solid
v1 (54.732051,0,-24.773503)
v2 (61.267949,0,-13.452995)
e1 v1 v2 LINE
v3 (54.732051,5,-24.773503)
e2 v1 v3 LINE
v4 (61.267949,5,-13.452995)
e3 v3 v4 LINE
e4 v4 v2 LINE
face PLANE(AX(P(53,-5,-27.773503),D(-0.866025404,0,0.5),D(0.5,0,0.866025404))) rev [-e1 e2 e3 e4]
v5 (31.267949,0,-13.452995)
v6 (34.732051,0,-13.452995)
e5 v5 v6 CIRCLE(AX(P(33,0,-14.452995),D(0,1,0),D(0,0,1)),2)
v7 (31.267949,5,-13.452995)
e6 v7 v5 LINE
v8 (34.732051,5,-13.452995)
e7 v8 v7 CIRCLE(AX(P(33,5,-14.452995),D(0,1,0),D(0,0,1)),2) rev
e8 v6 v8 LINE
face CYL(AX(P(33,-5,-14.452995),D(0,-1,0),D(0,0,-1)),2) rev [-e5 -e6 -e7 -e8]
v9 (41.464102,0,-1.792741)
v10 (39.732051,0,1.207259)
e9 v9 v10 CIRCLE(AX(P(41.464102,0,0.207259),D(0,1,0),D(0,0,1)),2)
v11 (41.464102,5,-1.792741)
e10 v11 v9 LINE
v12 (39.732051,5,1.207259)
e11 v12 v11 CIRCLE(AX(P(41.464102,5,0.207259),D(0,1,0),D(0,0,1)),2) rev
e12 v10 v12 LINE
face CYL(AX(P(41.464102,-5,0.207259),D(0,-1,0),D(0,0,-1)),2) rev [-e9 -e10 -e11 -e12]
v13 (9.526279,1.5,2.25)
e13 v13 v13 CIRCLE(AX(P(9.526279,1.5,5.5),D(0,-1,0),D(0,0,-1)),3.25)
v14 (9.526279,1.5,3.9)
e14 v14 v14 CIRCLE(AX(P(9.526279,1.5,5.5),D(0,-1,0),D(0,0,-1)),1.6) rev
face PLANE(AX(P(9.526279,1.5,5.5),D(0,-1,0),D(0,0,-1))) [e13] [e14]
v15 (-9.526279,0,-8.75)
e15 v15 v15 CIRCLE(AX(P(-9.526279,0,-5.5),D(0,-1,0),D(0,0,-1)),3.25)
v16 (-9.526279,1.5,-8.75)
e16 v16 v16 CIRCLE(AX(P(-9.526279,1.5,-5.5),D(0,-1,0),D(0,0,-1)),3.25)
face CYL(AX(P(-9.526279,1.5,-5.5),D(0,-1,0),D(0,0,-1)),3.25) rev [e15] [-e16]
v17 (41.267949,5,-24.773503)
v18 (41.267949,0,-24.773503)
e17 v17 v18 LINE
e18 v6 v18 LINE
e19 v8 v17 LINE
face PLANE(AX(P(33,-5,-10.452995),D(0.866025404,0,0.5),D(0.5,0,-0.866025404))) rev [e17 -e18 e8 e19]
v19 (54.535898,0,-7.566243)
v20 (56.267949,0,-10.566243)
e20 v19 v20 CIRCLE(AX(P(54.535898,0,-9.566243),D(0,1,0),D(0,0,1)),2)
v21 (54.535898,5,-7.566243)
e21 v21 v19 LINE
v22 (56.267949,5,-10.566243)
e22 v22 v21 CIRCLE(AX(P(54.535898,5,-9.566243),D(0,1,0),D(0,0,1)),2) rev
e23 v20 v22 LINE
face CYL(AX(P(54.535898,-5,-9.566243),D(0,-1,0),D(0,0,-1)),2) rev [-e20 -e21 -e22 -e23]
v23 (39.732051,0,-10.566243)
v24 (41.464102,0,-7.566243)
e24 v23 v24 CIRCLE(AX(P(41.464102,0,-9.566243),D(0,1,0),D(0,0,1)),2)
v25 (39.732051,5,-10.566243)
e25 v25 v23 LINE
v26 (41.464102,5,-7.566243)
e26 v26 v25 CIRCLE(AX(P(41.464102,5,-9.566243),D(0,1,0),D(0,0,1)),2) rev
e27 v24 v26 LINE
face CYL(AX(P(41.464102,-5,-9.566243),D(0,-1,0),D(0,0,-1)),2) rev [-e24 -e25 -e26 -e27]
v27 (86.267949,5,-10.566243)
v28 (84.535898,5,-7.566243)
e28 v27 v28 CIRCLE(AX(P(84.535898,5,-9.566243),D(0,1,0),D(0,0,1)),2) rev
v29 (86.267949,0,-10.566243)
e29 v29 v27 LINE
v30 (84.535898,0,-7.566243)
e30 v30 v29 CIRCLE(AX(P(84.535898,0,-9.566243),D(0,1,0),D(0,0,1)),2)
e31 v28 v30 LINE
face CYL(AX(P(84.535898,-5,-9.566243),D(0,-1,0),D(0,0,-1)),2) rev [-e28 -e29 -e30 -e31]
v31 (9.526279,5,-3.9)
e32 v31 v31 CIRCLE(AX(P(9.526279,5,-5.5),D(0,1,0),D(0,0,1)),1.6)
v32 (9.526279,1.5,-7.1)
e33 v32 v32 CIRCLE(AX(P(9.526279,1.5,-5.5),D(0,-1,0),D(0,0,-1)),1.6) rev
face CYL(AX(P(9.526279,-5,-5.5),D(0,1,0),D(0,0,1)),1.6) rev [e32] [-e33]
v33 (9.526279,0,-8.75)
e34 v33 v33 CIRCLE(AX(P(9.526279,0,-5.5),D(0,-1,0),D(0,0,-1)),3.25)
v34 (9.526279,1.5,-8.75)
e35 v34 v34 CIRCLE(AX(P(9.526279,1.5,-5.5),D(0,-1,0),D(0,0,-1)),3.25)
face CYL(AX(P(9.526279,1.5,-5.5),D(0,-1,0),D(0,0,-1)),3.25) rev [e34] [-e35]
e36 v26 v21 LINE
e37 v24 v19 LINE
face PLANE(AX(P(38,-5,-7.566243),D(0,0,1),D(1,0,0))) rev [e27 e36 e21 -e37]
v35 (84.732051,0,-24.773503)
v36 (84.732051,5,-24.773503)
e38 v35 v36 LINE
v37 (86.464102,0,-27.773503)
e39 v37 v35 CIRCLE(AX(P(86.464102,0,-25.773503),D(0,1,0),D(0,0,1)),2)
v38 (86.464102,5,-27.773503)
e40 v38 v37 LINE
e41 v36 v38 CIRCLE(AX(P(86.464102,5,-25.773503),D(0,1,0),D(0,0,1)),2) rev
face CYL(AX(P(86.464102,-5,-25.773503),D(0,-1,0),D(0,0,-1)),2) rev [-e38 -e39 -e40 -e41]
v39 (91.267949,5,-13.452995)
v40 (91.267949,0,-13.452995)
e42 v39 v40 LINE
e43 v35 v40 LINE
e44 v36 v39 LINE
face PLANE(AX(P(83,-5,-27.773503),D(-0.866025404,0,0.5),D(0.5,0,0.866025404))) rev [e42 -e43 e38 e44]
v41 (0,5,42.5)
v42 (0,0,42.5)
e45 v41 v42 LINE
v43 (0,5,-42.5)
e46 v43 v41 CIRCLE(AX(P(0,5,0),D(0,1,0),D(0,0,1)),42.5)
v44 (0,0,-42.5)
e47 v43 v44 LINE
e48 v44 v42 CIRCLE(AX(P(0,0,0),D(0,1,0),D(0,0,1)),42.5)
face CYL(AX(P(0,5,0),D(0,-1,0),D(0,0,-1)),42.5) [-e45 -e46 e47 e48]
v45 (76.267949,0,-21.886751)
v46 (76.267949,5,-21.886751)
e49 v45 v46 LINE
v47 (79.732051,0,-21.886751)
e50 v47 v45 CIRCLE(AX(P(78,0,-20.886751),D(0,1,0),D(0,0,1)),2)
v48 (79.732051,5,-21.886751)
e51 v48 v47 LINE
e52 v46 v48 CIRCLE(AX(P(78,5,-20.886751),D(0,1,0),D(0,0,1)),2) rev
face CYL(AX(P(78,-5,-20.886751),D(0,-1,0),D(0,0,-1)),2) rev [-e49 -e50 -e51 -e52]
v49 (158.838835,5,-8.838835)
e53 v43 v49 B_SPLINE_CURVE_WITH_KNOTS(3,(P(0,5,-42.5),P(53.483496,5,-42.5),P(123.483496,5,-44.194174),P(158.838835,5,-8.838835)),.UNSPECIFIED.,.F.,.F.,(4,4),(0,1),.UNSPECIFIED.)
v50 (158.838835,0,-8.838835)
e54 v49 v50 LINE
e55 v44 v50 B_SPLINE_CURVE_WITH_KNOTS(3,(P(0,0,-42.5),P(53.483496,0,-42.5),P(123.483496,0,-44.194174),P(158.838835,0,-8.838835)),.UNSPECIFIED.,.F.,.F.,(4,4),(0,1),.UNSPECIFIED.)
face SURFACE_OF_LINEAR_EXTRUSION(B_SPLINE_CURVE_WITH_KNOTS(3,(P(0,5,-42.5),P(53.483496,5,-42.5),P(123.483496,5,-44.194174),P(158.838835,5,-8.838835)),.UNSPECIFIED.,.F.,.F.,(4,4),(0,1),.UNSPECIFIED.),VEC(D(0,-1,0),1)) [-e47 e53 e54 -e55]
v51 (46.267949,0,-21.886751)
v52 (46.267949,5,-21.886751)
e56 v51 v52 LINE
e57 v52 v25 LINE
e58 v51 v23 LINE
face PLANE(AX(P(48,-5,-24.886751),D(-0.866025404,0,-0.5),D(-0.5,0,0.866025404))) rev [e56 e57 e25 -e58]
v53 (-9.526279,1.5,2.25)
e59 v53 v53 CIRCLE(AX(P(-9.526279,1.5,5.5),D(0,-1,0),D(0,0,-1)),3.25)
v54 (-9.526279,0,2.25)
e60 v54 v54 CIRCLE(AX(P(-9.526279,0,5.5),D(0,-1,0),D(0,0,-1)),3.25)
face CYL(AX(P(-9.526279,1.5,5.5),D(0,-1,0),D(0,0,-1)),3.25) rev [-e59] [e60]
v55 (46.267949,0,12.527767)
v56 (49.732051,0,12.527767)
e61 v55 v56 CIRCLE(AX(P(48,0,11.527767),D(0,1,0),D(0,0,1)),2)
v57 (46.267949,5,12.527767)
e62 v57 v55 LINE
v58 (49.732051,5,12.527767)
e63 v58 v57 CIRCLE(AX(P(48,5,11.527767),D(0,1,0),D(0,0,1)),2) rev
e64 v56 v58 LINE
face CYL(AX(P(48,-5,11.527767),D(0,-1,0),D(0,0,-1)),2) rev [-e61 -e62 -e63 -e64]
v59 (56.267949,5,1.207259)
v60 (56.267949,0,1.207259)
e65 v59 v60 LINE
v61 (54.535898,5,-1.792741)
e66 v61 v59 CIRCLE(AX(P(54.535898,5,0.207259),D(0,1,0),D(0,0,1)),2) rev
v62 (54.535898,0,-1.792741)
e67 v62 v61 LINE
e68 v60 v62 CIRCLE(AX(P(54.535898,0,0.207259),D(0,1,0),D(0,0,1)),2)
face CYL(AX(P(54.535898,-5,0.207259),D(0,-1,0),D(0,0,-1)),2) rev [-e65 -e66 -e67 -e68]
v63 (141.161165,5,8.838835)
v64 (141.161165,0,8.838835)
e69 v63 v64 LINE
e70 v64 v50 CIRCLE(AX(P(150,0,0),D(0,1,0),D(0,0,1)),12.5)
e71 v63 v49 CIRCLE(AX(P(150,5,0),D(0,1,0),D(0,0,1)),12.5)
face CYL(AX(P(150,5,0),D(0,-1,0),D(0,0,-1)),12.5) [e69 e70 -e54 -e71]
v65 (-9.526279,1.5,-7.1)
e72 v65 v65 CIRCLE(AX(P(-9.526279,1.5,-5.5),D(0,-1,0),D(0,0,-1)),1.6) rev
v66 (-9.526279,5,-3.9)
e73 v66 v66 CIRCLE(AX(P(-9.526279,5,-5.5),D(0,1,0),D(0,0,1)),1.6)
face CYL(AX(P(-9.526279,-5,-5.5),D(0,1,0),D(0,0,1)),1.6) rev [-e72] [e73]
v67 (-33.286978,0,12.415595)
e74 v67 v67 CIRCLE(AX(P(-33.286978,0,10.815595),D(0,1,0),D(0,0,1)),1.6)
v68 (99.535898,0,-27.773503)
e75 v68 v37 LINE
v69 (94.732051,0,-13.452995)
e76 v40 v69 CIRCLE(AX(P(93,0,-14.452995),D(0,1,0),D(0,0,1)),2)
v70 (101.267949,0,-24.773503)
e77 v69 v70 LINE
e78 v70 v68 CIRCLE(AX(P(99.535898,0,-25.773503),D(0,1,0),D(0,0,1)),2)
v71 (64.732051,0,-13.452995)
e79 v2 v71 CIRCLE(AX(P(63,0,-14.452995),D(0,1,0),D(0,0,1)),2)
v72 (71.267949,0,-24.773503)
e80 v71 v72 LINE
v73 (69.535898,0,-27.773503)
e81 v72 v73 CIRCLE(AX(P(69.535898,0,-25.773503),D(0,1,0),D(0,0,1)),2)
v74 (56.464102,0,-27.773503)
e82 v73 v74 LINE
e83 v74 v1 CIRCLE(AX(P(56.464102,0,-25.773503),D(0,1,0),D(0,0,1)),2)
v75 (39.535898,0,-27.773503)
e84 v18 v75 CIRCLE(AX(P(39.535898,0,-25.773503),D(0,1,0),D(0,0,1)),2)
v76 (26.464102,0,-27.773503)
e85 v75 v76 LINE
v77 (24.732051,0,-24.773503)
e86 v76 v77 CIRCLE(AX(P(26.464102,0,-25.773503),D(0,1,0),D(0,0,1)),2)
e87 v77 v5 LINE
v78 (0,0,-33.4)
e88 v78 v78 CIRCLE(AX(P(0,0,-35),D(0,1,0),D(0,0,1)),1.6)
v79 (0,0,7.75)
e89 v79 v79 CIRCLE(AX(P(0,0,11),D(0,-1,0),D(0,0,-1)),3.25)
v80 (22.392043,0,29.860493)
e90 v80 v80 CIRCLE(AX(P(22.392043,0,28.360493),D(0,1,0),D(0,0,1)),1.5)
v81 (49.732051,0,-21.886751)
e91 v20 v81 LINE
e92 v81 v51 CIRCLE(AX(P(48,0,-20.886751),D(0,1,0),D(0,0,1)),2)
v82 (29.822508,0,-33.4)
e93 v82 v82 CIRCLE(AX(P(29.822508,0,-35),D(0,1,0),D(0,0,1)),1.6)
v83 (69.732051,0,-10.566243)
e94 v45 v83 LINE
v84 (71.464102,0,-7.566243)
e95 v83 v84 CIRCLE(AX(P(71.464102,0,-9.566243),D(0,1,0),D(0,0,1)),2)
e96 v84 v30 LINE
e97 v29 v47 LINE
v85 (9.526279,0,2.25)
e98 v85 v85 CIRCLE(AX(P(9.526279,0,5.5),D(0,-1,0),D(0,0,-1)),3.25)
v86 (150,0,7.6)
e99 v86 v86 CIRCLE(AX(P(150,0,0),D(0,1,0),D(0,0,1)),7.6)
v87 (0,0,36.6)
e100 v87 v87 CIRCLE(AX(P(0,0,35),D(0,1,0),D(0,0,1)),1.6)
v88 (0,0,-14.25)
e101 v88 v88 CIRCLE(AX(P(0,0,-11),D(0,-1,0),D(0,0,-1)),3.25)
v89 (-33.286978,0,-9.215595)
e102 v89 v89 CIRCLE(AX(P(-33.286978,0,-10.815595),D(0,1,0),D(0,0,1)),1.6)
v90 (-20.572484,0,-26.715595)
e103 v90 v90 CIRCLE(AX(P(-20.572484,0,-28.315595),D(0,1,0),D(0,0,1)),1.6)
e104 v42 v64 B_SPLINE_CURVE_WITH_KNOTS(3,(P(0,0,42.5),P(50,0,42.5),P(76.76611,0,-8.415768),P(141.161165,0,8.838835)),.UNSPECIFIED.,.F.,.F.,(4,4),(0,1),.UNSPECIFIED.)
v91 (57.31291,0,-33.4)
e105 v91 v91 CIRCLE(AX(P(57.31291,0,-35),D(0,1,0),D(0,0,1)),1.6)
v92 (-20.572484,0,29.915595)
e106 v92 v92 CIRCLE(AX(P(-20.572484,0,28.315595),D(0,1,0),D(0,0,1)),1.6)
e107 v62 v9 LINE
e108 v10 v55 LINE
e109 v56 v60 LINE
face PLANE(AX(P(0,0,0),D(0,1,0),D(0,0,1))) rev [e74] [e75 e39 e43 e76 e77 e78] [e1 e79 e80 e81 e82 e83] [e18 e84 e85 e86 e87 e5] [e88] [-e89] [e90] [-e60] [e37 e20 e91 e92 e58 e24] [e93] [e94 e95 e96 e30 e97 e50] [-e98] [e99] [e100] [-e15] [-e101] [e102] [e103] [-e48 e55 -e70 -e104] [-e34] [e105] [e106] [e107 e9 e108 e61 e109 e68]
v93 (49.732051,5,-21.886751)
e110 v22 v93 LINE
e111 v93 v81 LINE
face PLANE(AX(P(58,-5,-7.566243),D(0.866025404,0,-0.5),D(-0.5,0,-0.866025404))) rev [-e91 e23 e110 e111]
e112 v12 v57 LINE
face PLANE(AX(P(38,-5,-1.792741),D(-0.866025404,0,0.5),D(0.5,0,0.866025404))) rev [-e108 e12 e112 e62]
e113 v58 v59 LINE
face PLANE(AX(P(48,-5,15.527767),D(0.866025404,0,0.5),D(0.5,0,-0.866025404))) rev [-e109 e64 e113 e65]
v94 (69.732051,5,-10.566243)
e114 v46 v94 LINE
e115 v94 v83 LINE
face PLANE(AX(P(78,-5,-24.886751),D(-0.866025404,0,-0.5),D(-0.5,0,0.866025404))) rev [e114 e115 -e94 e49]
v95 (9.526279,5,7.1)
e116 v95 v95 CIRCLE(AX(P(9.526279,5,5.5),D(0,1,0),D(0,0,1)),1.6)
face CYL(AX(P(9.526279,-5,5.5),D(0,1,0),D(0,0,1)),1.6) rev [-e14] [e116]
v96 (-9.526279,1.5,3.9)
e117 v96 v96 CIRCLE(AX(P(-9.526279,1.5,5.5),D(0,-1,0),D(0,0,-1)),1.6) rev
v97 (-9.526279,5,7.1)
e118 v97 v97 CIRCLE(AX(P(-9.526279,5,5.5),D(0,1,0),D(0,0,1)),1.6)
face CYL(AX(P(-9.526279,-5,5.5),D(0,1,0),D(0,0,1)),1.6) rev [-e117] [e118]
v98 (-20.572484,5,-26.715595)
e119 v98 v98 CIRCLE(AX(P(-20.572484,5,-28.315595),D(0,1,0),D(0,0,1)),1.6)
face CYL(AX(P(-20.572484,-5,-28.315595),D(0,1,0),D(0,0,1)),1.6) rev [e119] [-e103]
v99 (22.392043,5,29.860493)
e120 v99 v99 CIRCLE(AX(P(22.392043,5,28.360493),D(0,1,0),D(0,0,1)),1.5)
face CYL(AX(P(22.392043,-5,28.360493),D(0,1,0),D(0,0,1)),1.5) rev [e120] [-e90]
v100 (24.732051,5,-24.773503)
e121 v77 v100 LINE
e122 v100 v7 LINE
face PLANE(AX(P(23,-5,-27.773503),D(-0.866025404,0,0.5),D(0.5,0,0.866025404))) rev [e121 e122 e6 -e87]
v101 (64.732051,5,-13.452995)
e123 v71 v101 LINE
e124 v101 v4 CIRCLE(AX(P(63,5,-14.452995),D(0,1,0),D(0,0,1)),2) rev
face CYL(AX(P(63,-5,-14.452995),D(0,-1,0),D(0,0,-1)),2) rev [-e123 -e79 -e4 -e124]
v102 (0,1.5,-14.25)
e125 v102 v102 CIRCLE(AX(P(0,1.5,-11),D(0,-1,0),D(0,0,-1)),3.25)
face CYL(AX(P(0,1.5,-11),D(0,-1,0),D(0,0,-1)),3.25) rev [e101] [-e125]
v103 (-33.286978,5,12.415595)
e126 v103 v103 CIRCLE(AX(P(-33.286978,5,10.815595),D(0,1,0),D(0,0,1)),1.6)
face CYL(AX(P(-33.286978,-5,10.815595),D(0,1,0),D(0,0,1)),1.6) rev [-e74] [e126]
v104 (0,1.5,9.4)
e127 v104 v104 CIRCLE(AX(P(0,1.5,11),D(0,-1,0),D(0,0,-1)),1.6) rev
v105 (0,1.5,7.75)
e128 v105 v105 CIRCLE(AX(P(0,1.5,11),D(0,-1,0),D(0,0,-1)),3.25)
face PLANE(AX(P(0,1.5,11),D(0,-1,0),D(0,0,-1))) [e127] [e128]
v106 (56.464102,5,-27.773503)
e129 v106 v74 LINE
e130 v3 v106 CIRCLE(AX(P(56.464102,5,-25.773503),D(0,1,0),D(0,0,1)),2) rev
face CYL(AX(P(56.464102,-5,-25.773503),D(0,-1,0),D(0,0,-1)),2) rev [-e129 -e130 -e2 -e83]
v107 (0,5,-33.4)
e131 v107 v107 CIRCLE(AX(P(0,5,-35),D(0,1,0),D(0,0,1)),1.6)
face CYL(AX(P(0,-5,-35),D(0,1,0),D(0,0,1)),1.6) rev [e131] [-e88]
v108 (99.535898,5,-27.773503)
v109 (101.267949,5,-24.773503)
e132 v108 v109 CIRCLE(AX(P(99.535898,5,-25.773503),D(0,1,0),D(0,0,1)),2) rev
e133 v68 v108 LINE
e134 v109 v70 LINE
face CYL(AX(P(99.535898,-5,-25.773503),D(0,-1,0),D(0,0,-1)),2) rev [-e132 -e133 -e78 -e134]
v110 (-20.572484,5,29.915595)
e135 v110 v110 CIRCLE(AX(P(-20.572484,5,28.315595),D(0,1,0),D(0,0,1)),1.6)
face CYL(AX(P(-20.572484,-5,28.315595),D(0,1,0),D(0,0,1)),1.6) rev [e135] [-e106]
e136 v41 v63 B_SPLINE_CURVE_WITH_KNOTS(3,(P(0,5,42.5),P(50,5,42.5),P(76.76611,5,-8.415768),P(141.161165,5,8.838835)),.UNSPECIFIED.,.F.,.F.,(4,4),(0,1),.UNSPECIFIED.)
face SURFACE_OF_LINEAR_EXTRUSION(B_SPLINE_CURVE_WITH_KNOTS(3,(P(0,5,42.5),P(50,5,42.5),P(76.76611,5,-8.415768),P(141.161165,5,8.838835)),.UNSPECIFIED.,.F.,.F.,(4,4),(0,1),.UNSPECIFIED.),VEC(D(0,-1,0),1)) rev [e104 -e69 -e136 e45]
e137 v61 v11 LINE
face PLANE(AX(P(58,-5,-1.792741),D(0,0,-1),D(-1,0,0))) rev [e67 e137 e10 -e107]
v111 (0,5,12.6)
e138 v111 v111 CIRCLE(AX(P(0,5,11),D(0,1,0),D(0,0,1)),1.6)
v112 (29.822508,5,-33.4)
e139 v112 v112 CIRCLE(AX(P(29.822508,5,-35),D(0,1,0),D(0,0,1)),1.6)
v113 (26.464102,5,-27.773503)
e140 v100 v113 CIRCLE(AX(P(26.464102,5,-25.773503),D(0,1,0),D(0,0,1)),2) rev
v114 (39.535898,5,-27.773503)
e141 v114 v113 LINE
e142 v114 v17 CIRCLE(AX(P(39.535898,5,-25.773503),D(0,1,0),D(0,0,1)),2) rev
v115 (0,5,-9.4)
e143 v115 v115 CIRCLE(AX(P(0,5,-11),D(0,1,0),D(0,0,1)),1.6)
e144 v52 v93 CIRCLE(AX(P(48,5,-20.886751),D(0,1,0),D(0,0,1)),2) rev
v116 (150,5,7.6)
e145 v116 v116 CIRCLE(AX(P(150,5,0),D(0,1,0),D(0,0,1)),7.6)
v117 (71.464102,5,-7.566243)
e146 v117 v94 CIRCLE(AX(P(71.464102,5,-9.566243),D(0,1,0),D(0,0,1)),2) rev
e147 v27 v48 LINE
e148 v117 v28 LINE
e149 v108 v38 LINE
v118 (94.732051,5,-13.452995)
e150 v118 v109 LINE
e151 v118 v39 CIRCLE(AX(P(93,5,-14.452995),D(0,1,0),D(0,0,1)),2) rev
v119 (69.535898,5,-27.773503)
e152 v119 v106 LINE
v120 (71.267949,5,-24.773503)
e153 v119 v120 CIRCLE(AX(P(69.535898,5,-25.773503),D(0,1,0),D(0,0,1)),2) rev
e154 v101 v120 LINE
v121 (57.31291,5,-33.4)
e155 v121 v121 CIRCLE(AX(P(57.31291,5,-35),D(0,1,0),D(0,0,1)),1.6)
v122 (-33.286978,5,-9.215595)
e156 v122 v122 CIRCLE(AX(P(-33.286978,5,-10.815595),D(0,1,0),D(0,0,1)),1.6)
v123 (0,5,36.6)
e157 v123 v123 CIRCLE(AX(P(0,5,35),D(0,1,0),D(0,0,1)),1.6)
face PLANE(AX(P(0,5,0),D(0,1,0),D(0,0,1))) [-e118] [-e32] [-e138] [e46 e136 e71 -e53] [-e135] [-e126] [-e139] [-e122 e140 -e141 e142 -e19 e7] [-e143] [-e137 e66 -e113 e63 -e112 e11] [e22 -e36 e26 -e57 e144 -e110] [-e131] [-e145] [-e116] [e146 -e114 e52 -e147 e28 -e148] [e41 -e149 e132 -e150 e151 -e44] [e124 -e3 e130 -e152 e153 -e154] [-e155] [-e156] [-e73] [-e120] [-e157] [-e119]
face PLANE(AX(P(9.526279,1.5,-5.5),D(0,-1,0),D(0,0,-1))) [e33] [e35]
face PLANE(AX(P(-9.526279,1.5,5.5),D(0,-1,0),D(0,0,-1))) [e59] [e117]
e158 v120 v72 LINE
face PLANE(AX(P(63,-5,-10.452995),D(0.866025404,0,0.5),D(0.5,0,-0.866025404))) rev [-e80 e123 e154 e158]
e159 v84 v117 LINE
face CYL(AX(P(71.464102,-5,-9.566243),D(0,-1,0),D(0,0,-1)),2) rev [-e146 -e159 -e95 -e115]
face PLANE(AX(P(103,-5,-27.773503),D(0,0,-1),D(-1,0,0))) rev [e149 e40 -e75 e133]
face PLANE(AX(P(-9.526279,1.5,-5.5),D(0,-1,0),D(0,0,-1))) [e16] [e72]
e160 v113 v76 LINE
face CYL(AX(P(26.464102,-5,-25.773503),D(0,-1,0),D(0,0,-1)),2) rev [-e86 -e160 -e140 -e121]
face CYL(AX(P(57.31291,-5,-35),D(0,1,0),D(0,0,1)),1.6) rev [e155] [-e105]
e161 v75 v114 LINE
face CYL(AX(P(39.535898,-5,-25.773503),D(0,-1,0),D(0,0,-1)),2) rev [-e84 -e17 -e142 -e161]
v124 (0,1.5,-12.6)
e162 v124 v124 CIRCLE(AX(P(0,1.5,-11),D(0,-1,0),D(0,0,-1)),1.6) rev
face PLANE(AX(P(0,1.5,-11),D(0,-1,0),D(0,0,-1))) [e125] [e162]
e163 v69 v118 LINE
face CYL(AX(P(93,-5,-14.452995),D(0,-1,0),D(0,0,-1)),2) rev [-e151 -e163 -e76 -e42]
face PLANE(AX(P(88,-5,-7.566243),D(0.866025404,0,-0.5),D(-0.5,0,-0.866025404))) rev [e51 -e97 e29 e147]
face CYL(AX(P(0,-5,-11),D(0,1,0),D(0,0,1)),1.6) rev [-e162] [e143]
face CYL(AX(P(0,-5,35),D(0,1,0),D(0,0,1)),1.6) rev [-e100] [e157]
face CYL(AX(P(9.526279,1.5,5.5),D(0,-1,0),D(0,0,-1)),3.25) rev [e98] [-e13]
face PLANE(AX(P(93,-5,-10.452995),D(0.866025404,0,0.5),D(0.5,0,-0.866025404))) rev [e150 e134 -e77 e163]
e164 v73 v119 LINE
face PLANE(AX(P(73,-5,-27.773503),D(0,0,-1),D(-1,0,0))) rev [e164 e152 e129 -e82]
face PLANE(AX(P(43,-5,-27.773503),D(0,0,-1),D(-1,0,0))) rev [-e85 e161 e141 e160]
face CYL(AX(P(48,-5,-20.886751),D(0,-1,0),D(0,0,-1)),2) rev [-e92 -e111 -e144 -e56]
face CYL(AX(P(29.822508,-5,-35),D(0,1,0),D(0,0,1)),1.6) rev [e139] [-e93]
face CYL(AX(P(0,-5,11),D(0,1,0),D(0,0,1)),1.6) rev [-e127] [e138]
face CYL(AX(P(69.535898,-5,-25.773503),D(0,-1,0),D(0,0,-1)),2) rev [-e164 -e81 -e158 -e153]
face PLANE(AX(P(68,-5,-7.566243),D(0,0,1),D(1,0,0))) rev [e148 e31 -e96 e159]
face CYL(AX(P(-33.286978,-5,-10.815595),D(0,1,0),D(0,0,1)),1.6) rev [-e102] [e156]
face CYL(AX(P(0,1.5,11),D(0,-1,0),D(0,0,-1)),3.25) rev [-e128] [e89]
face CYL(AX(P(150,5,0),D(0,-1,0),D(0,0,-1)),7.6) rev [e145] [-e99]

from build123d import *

# Parameters (mm, degrees)
BOSS_EXTRUDE3_OUTLINE_R = 7.6
BOSS_EXTRUDE3_DEPTH     = 5
SKETCH2_R               = 1.6
CUT_EXTRUDE1_DEPTH      = 10
SKETCH3_R               = 1.6
CUT_EXTRUDE2_DEPTH      = 10
SKETCH4_R               = 1.5
CUT_EXTRUDE3_DEPTH      = 10
SKETCH5_R               = 3.25
CUT_EXTRUDE4_DEPTH      = 1.5
CUT_EXTRUDE5_DEPTH      = 10
FILLET1_R               = 2
FILL_PATTERN1_DEPTH     = 5
CUT_EXTRUDE6_DEPTH      = 10
FILLET2_R               = 2
FILL_PATTERN2_DEPTH     = 5


# Read off the part's stored shape, not the designer's step: Boss-Extrude3, Fill Pattern1, Fill Pattern2
with BuildPart() as part:
    # Boss-Extrude3 outline → Boss-Extrude3 (new body)
    with BuildSketch(Plane(origin=(0, 0, 0), x_dir=(1, 0, 0), z_dir=(0, 1, 0))):
        with BuildLine():
            ThreePointArc((0, 42.5), (-42.5, 0), (0, -42.5))
            add(Edge.make_bspline(
                [(0, -42.5), (50, -42.5), (76.766110149, 8.415768242), (141.161165235, -8.838834765)],
                knots=[0, 0, 0, 0, 1, 1, 1, 1], degree=3))
            ThreePointArc((141.161165235, -8.838834765), (158.838834765, -8.838834765), (158.838834765, 8.838834765))
            add(Edge.make_bspline(
                [(0, 42.5), (53.483495706, 42.5), (123.483495706, 44.194173824), (158.838834765, 8.838834765)],
                knots=[0, 0, 0, 0, 1, 1, 1, 1], degree=3))
        make_face()
        with Locations((150, 0)):
            Circle(BOSS_EXTRUDE3_OUTLINE_R, mode=Mode.SUBTRACT)
    extrude(amount=BOSS_EXTRUDE3_DEPTH)

    # Sketch2 → Cut-Extrude1 (cut)
    with BuildSketch(Plane(origin=(0, 5, 0), x_dir=(1, 0, 0), z_dir=(0, 1, 0))):
        with Locations(Location((0, 35, 0), (0, 0, 270))):
            Circle(SKETCH2_R)
        with Locations(Location((0, 11, 0), (0, 0, 270))):
            Circle(SKETCH2_R)
        with Locations(Location((9.526279442, 5.5, 0), (0, 0, 270))):
            Circle(SKETCH2_R)
        with Locations(Location((9.526279442, -5.5, 0), (0, 0, 270))):
            Circle(SKETCH2_R)
        with Locations(Location((0, -11, 0), (0, 0, 270))):
            Circle(SKETCH2_R)
        with Locations(Location((-9.526279442, -5.5, 0), (0, 0, 270))):
            Circle(SKETCH2_R)
        with Locations(Location((-9.526279442, 5.5, 0), (0, 0, 270))):
            Circle(SKETCH2_R)
        with Locations(Location((-20.57248383, 28.315594803, 0), (0, 0, 270))):
            Circle(SKETCH2_R)
        with Locations(Location((-33.28697807, 10.815594803, 0), (0, 0, 270))):
            Circle(SKETCH2_R)
        with Locations(Location((-33.28697807, -10.815594803, 0), (0, 0, 270))):
            Circle(SKETCH2_R)
        with Locations(Location((-20.57248383, -28.315594803, 0), (0, 0, 270))):
            Circle(SKETCH2_R)
        with Locations(Location((0, -35, 0), (0, 0, 270))):
            Circle(SKETCH2_R)
    extrude(amount=-CUT_EXTRUDE1_DEPTH, mode=Mode.SUBTRACT)

    # Sketch3 → Cut-Extrude2 (cut)
    with BuildSketch(Plane(origin=(0, 5, 0), x_dir=(1, 0, 0), z_dir=(0, 1, 0))):
        with Locations(Location((29.822508304, 35, 0), (0, 0, 270))):
            Circle(SKETCH3_R)
        with Locations(Location((57.312909887, 35, 0), (0, 0, 270))):
            Circle(SKETCH3_R)
    extrude(amount=-CUT_EXTRUDE2_DEPTH, mode=Mode.SUBTRACT)

    # Sketch4 → Cut-Extrude3 (cut)
    with BuildSketch(Plane(origin=(0, 5, 0), x_dir=(1, 0, 0), z_dir=(0, 1, 0))):
        with Locations(Location((22.392043347, -28.36049342, 0), (0, 0, 270))):
            Circle(SKETCH4_R)
    extrude(amount=-CUT_EXTRUDE3_DEPTH, mode=Mode.SUBTRACT)

    # Sketch5 → Cut-Extrude4 (cut)
    with BuildSketch(Plane.XZ):
        with Locations(Location((0, 11, 0), (0, 0, 270))):
            Circle(SKETCH5_R)
        with Locations(Location((9.526279442, 5.5, 0), (0, 0, 270))):
            Circle(SKETCH5_R)
        with Locations(Location((9.526279442, -5.5, 0), (0, 0, 270))):
            Circle(SKETCH5_R)
        with Locations(Location((0, -11, 0), (0, 0, 270))):
            Circle(SKETCH5_R)
        with Locations(Location((-9.526279442, -5.5, 0), (0, 0, 270))):
            Circle(SKETCH5_R)
        with Locations(Location((-9.526279442, 5.5, 0), (0, 0, 270))):
            Circle(SKETCH5_R)
    extrude(amount=-CUT_EXTRUDE4_DEPTH, mode=Mode.SUBTRACT)

    # Sketch6 → Cut-Extrude5 (cut)
    with BuildSketch(Plane(origin=(0, 5, 0), x_dir=(1, 0, 0), z_dir=(0, 1, 0))):
        Polygon((43, 27.773502692), (23, 27.773502692), (33, 10.452994616), align=None)
    extrude(amount=-CUT_EXTRUDE5_DEPTH, mode=Mode.SUBTRACT)

    # Fillet1
    fillet1_edges = [part.edges().sort_by_distance(p)[0] for p in [
        (43, 2.5, -27.773502692),
        (33, 2.5, -10.452994616),
        (23, 2.5, -27.773502692),
    ]]
    fillet(fillet1_edges, radius=FILLET1_R)

    # Fill Pattern1 outline → Fill Pattern1 (cut)
    with BuildSketch(Plane(origin=(0, 0, 0), x_dir=(1, 0, 0), z_dir=(0, 1, 0))):
        with BuildLine():
            ThreePointArc((41.464101615, 1.792740578), (39.732050808, 0.792740578), (39.732050808, -1.207259422))
            Line((39.732050808, -1.207259422), (46.267949192, -12.527767497))
            ThreePointArc((46.267949192, -12.527767497), (48, -13.527767497), (49.732050808, -12.527767497))
            Line((49.732050808, -12.527767497), (56.267949192, -1.207259422))
            ThreePointArc((56.267949192, -1.207259422), (56.267949192, 0.792740578), (54.535898385, 1.792740578))
            Line((54.535898385, 1.792740578), (41.464101615, 1.792740578))
        make_face()
        with BuildLine():
            ThreePointArc((101.267949192, 24.773502692), (101.267949192, 26.773502692), (99.535898385, 27.773502692))
            Line((99.535898385, 27.773502692), (86.464101615, 27.773502692))
            ThreePointArc((86.464101615, 27.773502692), (84.732050808, 26.773502692), (84.732050808, 24.773502692))
            Line((84.732050808, 24.773502692), (91.267949192, 13.452994616))
            ThreePointArc((91.267949192, 13.452994616), (93, 12.452994616), (94.732050808, 13.452994616))
            Line((94.732050808, 13.452994616), (101.267949192, 24.773502692))
        make_face()
        with BuildLine():
            ThreePointArc((71.267949192, 24.773502692), (71.267949192, 26.773502692), (69.535898385, 27.773502692))
            Line((69.535898385, 27.773502692), (56.464101615, 27.773502692))
            ThreePointArc((56.464101615, 27.773502692), (54.732050808, 26.773502692), (54.732050808, 24.773502692))
            Line((54.732050808, 24.773502692), (61.267949192, 13.452994616))
            ThreePointArc((61.267949192, 13.452994616), (63, 12.452994616), (64.732050808, 13.452994616))
            Line((64.732050808, 13.452994616), (71.267949192, 24.773502692))
        make_face()
    extrude(amount=FILL_PATTERN1_DEPTH, mode=Mode.SUBTRACT)

    # Sketch8 → Cut-Extrude6 (cut)
    with BuildSketch(Plane(origin=(0, 5, 0), x_dir=(1, 0, 0), z_dir=(0, 1, 0))):
        Polygon((58, 7.56624327), (48, 24.886751346), (38, 7.56624327), align=None)
    extrude(amount=-CUT_EXTRUDE6_DEPTH, mode=Mode.SUBTRACT)

    # Fillet2
    fillet2_edges = [part.edges().sort_by_distance(p)[0] for p in [
        (58, 2.5, -7.56624327),
        (38, 2.5, -7.56624327),
        (48, 2.5, -24.886751346),
    ]]
    fillet(fillet2_edges, radius=FILLET2_R)

    # Fill Pattern2 outline → Fill Pattern2 (cut)
    with BuildSketch(Plane(origin=(0, 0, 0), x_dir=(1, 0, 0), z_dir=(0, 1, 0))):
        with BuildLine():
            ThreePointArc((69.732050808, 10.56624327), (69.732050808, 8.56624327), (71.464101615, 7.56624327))
            Line((71.464101615, 7.56624327), (84.535898385, 7.56624327))
            ThreePointArc((84.535898385, 7.56624327), (86.267949192, 8.56624327), (86.267949192, 10.56624327))
            Line((86.267949192, 10.56624327), (79.732050808, 21.886751346))
            ThreePointArc((79.732050808, 21.886751346), (78, 22.886751346), (76.267949192, 21.886751346))
            Line((76.267949192, 21.886751346), (69.732050808, 10.56624327))
        make_face()
    extrude(amount=FILL_PATTERN2_DEPTH, mode=Mode.SUBTRACT)


solid = part.part
